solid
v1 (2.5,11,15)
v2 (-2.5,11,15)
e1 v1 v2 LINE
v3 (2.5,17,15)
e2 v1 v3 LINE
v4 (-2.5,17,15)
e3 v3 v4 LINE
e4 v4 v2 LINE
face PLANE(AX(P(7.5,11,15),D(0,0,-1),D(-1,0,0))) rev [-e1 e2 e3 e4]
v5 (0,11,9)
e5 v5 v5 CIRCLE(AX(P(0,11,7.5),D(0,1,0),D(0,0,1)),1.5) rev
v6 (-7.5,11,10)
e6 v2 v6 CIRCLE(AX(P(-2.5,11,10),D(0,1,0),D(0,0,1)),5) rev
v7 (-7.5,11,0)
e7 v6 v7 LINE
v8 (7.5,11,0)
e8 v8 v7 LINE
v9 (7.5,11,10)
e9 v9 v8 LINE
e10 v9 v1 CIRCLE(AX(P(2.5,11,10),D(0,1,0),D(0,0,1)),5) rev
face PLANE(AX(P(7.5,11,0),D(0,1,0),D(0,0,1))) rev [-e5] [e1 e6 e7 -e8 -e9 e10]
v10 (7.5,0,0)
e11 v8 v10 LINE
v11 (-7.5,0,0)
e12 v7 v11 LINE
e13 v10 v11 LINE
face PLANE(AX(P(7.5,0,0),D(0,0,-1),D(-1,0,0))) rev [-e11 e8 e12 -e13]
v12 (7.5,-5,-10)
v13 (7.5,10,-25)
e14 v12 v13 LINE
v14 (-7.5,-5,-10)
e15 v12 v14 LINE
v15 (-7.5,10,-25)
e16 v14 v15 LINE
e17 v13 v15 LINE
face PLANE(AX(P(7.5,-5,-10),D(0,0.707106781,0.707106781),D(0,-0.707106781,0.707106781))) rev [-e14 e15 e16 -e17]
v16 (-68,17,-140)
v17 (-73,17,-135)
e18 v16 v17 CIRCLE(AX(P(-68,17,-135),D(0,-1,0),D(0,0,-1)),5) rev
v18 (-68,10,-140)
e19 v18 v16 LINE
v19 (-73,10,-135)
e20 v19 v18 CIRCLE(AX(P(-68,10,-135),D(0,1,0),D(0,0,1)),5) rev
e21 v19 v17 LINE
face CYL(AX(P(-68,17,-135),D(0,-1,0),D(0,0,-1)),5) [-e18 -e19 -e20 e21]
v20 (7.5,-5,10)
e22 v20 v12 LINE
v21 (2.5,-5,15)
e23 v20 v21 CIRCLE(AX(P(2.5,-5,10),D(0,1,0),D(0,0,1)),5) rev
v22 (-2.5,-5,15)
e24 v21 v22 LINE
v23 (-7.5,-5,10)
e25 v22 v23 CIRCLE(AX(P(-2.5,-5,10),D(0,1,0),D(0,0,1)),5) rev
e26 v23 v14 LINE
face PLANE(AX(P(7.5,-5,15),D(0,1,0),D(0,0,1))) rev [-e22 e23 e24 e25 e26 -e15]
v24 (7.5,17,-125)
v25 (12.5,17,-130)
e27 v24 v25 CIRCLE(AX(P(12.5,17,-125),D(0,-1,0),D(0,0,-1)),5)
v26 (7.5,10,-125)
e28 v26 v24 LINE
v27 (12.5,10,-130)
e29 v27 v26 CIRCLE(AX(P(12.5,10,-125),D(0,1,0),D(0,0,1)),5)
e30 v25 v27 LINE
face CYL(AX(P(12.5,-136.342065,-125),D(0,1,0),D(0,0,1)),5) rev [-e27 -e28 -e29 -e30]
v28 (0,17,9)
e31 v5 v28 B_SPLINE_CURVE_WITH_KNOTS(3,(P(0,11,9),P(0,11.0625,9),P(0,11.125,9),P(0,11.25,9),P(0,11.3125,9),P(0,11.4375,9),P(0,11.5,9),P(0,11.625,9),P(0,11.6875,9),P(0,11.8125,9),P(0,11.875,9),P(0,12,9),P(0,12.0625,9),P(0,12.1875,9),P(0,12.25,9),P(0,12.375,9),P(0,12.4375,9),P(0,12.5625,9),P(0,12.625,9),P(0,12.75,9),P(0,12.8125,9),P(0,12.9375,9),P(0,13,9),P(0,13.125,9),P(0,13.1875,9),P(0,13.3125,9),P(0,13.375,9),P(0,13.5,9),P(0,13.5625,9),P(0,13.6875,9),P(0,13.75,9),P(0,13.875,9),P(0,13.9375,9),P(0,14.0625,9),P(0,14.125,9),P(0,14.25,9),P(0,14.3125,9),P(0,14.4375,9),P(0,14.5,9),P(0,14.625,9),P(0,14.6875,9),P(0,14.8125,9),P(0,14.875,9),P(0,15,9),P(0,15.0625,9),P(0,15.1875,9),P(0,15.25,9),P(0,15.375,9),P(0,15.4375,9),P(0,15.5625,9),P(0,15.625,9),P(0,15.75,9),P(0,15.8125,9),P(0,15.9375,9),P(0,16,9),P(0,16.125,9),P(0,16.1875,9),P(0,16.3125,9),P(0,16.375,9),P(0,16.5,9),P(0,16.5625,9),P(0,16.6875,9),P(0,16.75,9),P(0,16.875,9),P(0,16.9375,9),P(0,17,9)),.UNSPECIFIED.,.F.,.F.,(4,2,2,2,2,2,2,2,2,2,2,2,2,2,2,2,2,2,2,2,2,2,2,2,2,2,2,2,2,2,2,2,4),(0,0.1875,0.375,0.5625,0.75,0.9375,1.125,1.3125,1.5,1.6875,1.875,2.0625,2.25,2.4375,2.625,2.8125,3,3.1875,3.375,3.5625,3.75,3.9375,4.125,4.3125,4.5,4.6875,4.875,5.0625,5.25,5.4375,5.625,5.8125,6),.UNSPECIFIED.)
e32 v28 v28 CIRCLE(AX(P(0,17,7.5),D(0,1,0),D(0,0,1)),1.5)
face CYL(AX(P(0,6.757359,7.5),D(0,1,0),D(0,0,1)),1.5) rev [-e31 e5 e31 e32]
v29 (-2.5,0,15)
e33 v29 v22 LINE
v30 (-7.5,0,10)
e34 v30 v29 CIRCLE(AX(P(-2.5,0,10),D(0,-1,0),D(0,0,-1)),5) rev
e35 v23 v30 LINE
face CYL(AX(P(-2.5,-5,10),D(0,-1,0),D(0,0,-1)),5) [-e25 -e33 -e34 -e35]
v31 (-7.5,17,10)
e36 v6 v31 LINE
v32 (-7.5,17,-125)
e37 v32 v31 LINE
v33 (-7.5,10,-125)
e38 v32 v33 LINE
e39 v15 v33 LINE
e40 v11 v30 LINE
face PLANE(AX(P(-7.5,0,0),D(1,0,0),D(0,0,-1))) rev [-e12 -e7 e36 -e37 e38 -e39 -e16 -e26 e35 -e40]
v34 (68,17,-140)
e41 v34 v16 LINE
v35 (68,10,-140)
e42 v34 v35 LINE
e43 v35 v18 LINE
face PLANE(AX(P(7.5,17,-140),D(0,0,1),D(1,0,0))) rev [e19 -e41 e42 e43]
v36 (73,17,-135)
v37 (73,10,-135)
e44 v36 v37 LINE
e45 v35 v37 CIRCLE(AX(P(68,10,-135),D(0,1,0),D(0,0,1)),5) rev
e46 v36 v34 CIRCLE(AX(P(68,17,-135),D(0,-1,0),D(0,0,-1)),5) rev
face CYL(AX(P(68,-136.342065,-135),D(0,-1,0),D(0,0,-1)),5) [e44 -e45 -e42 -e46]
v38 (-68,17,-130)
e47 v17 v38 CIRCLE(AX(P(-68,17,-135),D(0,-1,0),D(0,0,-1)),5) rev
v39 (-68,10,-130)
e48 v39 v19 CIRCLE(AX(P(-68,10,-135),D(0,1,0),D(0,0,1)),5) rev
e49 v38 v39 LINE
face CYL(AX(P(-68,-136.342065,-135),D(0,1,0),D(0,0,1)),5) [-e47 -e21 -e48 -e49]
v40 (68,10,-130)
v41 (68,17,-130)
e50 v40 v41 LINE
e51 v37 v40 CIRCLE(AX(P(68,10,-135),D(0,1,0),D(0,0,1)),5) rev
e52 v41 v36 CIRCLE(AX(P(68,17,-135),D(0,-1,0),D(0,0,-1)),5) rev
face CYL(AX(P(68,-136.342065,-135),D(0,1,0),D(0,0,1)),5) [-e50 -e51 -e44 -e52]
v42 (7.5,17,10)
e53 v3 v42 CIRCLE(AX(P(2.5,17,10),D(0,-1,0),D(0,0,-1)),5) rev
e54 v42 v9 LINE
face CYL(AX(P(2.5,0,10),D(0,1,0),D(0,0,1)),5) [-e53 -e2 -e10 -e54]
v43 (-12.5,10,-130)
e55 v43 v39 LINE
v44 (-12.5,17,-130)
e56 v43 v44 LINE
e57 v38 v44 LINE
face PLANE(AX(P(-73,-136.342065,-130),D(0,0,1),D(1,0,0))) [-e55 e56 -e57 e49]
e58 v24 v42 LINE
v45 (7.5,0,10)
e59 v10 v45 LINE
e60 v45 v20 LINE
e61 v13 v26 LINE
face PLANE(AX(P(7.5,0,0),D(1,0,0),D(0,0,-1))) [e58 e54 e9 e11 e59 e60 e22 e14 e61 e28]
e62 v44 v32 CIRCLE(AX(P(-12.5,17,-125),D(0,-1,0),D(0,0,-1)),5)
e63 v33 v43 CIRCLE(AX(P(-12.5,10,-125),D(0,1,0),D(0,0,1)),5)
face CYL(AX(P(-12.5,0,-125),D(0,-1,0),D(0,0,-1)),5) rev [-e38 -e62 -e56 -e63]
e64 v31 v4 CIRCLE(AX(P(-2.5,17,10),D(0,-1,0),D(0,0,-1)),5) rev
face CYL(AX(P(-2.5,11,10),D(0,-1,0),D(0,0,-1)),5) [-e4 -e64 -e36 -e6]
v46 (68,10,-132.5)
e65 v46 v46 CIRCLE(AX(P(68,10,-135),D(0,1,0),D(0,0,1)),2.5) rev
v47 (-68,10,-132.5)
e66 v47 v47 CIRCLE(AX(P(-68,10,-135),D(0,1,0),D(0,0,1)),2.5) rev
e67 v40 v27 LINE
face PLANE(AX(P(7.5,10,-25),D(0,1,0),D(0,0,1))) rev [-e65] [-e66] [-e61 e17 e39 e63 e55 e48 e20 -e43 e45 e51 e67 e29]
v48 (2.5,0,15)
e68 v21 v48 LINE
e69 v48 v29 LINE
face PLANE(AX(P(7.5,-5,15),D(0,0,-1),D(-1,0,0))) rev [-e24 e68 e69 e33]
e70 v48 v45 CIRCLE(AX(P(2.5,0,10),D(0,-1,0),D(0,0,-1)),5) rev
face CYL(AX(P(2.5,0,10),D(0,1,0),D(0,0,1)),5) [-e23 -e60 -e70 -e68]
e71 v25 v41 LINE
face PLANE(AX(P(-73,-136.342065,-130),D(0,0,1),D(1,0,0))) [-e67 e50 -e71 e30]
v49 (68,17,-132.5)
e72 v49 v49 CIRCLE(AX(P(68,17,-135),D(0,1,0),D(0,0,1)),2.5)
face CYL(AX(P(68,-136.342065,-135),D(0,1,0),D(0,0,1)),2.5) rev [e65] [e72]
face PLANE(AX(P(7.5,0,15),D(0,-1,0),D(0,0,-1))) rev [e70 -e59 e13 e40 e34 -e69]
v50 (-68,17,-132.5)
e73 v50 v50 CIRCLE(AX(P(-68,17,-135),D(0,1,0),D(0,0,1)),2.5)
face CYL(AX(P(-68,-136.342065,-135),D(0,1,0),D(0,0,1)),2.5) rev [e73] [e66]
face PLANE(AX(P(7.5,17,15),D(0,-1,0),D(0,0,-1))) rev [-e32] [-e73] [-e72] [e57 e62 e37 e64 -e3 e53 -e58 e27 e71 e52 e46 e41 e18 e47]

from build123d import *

# Parameters (mm, degrees)
SALIENTE_EXTRUIR1_DEPTH = 7.5
CROQUIS4_R              = 1.5
CORTAR_EXTRUIR2_DEPTH   = 6
CROQUIS5_W              = 146
CROQUIS5_H              = 10
CROQUIS5_R              = 2.5
SALIENTE_EXTRUIR2_DEPTH = 7
REDONDEO2_R             = 5


with BuildPart() as part:
    # Croquis1 → Saliente-Extruir1 (new, symmetric)
    with BuildSketch(Plane(origin=(0, 0, 0), x_dir=(0, 0, -1), z_dir=(1, 0, 0))):
        Polygon((0, 0), (0, 11), (-15, 11), (-15, 17), (140, 17), (140, 10), (25, 10), (10, -5), (-15, -5), (-15, 0), align=None)
    extrude(amount=SALIENTE_EXTRUIR1_DEPTH, both=True)

    # Croquis4 → Cortar-Extruir2 (cut)
    with BuildSketch(Plane(origin=(0, 17, 0), x_dir=(1, 0, 0), z_dir=(0, 1, 0))):
        with Locations(Location((0, -7.5, 0), (0, 0, 270))):
            Circle(CROQUIS4_R)
    extrude(amount=-CORTAR_EXTRUIR2_DEPTH, mode=Mode.SUBTRACT)

    # Croquis5 → Saliente-Extruir2 (add)
    with BuildSketch(Plane(origin=(0, 17, 0), x_dir=(1, 0, 0), z_dir=(0, 1, 0))):
        with Locations((0, 135)):
            Rectangle(CROQUIS5_W, CROQUIS5_H)
        with Locations(Location((-68, 135, 0), (0, 0, 270))):
            Circle(CROQUIS5_R, mode=Mode.SUBTRACT)
        with Locations(Location((68, 135, 0), (0, 0, 270))):
            Circle(CROQUIS5_R, mode=Mode.SUBTRACT)
    extrude(amount=-SALIENTE_EXTRUIR2_DEPTH)

    # Redondeo2
    redondeo2_edges = [part.edges().sort_by_distance(p)[0] for p in [
        (-7.5, 13.5, -130),
        (-73, 13.5, -140),
        (-73, 13.5, -130),
        (7.5, 13.5, -130),
        (7.5, -2.5, 15),
        (-7.5, -2.5, 15),
        (-7.5, 14, 15),
        (7.5, 14, 15),
        (73, 13.5, -140),
        (73, 13.5, -130),
    ]]
    fillet(redondeo2_edges, radius=REDONDEO2_R - 0.0001)  # a hair under: the kernel refuses the full size


solid = part.part
